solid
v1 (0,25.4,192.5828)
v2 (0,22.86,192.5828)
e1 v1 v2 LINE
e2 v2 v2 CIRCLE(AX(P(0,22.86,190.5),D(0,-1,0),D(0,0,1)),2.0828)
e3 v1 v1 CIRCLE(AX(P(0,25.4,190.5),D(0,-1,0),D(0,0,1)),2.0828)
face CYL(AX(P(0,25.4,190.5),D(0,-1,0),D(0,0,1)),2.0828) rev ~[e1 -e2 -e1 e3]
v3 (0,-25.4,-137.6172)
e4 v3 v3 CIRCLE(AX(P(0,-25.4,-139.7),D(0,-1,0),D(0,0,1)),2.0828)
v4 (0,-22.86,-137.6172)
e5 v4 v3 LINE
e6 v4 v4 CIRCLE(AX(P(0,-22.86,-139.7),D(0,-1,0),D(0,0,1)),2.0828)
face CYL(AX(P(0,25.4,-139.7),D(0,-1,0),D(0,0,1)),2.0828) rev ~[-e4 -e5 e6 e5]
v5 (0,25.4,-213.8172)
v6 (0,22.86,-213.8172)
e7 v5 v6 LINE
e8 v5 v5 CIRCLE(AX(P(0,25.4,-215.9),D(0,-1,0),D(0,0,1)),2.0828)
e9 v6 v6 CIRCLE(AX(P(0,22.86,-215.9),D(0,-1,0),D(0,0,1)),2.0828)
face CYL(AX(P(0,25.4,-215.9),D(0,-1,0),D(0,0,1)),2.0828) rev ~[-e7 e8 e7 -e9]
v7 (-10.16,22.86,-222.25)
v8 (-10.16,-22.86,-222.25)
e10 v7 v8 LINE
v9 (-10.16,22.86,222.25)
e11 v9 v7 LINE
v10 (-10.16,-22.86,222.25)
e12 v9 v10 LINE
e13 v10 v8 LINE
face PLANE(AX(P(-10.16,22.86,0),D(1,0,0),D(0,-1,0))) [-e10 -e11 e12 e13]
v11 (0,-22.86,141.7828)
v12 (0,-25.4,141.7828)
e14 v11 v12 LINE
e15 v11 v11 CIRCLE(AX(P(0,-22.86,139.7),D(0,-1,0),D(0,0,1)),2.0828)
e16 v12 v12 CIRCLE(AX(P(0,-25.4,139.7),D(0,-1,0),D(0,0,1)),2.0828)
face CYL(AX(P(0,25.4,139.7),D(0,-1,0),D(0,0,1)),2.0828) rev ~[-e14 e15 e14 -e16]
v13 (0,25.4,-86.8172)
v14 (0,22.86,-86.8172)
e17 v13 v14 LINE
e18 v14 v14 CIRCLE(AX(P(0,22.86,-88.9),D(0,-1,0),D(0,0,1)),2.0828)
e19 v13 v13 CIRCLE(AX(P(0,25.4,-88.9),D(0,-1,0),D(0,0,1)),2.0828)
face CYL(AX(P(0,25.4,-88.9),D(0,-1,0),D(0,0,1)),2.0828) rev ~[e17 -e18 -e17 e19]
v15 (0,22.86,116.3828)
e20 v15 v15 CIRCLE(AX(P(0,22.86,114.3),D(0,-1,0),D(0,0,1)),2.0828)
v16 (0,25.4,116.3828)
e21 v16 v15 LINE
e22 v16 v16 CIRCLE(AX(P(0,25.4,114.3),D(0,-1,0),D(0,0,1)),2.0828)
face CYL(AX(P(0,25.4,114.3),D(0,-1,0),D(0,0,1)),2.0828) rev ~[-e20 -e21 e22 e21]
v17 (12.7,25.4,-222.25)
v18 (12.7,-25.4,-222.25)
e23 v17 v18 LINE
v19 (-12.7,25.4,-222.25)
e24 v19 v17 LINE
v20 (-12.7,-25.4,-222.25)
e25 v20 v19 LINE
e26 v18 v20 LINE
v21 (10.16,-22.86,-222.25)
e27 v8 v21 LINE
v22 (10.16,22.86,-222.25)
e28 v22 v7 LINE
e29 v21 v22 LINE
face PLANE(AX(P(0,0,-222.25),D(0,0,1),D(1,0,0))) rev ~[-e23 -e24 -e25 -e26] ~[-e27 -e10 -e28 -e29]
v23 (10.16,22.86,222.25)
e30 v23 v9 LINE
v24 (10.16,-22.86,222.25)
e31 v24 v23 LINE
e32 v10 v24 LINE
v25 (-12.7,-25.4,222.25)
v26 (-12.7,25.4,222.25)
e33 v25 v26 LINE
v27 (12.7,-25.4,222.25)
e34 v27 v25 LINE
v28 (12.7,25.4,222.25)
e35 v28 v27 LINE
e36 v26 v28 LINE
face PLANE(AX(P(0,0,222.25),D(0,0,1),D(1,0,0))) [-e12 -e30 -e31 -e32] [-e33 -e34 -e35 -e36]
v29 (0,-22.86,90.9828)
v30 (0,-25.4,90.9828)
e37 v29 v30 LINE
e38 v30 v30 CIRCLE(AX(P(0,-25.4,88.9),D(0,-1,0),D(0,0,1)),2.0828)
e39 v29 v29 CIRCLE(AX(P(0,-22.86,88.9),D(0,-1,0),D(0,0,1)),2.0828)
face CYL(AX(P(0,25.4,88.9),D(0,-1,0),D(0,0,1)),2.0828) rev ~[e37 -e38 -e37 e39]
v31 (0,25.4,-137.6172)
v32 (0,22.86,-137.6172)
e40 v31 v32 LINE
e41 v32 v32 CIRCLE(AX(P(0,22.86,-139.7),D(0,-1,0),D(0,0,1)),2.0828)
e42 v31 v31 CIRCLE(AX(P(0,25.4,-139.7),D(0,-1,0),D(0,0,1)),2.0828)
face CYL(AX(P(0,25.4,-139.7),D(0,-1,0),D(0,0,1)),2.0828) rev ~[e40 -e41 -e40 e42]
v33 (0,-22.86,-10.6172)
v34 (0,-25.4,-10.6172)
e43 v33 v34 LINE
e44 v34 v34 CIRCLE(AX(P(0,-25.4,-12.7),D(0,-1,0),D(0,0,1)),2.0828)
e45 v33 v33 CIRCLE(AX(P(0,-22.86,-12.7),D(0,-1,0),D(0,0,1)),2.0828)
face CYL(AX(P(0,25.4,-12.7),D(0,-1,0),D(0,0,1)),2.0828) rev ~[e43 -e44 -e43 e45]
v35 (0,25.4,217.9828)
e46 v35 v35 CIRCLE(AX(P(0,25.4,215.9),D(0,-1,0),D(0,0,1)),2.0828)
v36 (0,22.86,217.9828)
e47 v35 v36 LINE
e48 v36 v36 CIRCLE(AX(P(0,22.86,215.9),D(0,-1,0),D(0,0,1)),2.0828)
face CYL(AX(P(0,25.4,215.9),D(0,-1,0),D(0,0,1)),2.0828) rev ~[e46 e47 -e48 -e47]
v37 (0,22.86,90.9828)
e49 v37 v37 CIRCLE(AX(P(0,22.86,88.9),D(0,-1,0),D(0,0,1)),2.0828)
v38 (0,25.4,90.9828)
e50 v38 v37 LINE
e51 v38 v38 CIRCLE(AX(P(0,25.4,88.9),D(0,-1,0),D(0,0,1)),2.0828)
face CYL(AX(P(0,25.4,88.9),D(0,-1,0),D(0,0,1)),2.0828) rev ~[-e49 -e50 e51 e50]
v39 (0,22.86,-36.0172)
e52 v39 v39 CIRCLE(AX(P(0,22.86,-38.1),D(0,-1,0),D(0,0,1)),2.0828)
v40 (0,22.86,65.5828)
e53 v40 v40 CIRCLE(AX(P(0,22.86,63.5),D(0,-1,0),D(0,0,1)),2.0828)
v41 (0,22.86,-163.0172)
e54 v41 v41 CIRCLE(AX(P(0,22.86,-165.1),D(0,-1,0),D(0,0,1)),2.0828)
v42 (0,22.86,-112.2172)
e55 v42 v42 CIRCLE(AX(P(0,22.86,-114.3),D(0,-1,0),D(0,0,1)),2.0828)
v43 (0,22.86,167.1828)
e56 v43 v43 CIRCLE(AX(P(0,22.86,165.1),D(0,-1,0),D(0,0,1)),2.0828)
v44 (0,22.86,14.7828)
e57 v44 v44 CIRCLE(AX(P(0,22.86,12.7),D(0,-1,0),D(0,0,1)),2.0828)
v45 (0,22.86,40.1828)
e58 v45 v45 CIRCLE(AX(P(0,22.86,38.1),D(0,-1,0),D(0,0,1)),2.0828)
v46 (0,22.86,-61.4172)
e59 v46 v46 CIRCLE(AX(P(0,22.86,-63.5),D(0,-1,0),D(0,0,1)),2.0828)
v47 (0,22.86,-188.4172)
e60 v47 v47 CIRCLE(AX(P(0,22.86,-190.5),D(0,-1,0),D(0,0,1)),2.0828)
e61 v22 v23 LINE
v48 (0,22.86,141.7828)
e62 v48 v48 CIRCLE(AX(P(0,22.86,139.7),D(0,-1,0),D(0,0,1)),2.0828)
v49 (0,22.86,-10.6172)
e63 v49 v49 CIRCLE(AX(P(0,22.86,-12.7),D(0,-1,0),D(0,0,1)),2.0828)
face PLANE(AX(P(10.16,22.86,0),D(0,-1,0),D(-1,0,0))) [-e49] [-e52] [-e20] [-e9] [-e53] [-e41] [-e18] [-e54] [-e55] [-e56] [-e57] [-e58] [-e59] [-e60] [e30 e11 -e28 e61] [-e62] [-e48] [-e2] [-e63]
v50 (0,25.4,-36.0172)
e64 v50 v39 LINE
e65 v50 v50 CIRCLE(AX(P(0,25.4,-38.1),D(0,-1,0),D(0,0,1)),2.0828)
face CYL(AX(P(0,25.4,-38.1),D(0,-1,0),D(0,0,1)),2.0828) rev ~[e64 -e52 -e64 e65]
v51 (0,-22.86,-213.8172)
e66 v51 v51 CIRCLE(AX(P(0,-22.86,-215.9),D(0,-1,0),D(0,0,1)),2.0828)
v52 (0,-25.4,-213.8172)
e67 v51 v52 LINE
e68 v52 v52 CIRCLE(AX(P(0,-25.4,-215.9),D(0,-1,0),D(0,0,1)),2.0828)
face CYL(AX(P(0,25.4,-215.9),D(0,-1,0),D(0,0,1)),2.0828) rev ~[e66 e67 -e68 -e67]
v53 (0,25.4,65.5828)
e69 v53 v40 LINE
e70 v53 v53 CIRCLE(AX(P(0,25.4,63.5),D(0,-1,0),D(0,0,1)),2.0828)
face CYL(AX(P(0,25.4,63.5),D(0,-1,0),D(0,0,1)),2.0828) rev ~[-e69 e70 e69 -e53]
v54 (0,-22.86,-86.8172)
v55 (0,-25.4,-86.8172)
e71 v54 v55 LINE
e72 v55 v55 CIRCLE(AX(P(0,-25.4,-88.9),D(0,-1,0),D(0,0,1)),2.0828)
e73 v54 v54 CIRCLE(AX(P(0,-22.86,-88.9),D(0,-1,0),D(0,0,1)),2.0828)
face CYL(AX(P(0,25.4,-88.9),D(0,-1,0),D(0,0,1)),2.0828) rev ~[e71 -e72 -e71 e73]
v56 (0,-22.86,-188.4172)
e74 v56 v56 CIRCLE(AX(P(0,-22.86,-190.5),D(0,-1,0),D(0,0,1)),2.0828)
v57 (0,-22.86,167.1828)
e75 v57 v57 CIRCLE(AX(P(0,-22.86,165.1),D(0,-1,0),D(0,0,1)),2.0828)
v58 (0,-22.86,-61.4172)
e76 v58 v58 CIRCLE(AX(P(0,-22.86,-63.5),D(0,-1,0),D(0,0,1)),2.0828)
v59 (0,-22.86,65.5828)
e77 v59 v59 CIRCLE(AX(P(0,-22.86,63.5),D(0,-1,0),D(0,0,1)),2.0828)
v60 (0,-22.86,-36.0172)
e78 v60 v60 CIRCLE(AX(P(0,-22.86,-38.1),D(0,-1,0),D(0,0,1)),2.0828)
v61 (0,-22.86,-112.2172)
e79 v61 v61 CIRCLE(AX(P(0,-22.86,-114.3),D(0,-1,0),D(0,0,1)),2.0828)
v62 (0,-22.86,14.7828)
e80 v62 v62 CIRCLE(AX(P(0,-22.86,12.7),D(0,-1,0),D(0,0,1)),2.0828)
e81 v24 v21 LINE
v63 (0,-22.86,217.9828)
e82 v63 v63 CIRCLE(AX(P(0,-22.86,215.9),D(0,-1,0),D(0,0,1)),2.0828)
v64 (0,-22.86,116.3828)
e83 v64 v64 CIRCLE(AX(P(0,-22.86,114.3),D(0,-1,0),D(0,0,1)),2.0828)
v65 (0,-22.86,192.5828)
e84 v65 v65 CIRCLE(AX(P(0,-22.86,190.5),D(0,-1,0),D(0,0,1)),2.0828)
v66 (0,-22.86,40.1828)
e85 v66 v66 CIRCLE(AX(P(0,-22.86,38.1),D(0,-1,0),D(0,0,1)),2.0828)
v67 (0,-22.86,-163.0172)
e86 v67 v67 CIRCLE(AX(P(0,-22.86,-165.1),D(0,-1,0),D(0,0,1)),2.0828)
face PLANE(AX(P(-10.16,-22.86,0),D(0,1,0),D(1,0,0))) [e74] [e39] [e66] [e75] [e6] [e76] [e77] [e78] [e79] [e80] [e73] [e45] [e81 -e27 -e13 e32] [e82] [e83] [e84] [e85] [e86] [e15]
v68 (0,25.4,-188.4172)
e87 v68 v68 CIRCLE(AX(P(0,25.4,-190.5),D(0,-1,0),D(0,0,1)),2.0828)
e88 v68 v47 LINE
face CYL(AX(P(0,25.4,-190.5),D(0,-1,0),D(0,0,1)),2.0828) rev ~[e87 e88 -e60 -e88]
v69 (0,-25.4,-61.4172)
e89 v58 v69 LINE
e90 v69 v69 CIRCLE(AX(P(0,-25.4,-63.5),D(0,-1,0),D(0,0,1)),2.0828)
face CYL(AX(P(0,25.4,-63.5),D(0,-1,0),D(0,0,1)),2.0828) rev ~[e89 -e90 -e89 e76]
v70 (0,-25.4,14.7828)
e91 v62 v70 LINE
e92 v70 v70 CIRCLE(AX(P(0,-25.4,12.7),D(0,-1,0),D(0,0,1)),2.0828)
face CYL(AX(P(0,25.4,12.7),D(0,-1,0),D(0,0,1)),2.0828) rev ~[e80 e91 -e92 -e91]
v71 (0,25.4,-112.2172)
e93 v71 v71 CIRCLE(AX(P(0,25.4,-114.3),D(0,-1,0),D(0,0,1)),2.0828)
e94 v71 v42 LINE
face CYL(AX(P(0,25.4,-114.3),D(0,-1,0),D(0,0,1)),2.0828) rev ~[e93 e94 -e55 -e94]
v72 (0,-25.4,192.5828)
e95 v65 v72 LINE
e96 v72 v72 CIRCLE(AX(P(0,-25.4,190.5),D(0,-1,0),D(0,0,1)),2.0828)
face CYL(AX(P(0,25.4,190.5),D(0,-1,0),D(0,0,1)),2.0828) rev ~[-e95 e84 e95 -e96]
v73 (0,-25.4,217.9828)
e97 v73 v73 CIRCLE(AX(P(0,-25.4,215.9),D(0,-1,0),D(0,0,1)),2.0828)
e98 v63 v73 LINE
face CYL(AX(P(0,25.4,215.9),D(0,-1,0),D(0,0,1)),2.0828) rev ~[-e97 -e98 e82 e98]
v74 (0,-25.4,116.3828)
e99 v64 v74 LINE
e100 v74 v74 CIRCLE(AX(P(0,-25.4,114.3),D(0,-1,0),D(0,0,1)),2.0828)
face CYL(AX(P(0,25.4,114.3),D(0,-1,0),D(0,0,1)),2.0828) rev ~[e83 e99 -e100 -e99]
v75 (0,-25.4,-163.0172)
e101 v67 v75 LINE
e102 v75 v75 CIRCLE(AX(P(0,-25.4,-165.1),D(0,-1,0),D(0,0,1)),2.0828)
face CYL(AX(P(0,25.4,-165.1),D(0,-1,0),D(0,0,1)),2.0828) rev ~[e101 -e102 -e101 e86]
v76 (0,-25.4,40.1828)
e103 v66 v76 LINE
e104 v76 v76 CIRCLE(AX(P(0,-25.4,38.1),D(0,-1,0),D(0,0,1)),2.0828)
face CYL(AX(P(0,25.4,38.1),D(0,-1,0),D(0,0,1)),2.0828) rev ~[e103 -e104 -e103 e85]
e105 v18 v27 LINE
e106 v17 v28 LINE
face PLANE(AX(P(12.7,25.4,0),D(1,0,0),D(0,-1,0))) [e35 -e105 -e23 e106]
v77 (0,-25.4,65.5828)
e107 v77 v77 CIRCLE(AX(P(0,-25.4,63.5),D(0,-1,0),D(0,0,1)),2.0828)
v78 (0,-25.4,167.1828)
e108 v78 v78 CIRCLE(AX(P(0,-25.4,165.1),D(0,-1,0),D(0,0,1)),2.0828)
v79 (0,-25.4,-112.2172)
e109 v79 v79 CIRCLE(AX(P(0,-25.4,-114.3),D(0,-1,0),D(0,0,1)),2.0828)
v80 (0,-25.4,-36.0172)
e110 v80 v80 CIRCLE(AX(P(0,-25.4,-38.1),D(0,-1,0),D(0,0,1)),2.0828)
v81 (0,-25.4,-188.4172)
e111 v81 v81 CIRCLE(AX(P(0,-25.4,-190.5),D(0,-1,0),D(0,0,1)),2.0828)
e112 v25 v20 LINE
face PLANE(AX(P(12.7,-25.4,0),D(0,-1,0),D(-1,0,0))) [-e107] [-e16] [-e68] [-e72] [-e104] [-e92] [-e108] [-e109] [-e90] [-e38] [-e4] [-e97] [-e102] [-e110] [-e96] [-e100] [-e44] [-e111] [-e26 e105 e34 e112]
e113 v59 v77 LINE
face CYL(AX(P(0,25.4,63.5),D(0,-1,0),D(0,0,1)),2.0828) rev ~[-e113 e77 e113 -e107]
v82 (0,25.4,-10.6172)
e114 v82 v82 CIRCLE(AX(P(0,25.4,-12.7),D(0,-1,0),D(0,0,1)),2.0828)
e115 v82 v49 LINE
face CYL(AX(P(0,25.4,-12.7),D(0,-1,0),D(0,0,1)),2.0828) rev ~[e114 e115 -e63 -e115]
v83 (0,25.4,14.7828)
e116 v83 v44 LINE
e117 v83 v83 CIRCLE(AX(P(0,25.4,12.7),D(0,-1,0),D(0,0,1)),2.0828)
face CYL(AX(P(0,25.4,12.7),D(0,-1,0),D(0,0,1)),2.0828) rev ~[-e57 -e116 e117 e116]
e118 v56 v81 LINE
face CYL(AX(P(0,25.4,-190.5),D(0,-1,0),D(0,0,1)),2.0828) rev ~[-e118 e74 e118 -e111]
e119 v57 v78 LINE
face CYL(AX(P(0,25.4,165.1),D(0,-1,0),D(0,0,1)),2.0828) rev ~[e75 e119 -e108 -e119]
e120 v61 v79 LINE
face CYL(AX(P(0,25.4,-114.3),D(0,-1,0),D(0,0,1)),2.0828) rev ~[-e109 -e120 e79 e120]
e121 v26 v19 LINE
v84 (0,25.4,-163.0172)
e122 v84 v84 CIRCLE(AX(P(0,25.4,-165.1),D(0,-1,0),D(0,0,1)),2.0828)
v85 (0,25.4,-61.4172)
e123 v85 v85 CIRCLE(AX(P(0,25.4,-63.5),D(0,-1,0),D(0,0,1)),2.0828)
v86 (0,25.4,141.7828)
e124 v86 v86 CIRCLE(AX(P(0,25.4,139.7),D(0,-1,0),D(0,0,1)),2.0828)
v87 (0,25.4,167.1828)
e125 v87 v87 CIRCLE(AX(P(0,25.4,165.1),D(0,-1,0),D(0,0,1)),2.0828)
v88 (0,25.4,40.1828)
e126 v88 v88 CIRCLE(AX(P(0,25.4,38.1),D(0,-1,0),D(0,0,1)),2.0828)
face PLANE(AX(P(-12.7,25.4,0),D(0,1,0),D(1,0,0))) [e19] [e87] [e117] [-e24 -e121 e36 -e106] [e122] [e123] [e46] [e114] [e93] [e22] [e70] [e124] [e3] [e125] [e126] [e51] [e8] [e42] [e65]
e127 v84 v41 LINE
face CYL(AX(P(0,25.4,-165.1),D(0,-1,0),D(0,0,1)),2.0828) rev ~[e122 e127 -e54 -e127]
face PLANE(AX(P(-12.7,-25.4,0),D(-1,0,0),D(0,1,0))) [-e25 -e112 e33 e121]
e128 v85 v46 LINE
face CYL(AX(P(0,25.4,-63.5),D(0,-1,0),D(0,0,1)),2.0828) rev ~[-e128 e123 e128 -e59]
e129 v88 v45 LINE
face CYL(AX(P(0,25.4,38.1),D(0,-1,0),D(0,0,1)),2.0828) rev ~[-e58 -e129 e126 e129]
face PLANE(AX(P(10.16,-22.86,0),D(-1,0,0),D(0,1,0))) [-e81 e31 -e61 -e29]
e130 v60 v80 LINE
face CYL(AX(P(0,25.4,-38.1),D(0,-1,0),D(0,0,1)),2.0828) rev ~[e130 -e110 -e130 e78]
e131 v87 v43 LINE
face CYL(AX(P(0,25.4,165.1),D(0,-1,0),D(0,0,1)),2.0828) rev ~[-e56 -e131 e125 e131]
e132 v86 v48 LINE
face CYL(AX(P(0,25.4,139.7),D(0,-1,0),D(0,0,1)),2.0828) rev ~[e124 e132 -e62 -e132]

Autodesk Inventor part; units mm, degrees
ref_plane "YZ Plane" through (0, 0, 0) normal (1, 0, 0) x (0, 1, 0)
ref_plane "XZ Plane" through (0, 0, 0) normal (0, 1, 0) x (-1, 0, 0)
ref_plane "XY Plane" through (0, 0, 0) normal (0, 0, 1) x (1, 0, 0)
sketch "Sketch1" plane through (0, 0, 0) normal (0, 0, 1) x (1, 0, 0)
  line L0 (12.7, -25.4) -> (-12.7, -25.4)
  line L1 (-12.7, -25.4) -> (-12.7, 25.4)
  line L2 (-12.7, 25.4) -> (12.7, 25.4)
  line L3 (12.7, 25.4) -> (12.7, -25.4)
  line L4 (12.7, -25.4) -> (-12.7, 25.4) construction
  line L5 (-12.7, -25.4) -> (12.7, 25.4) construction
  line L6 (10.16, 22.86) -> (-10.16, 22.86)
  line L7 (-10.16, 22.86) -> (-10.16, -22.86)
  line L8 (-10.16, -22.86) -> (10.16, -22.86)
  line L9 (10.16, -22.86) -> (10.16, 22.86)
  point P0 (0, 0)
  dimension "d0" = 25.4
  dimension "d1" = 50.8
  dimension "d2" = 2.54
extrude "Extrusion1" add sketch "Sketch1" along normal mid plane 444.5
sketch "Sketch2" plane through (-12.7, 25.4, 222.25) normal (0, 1, 0) x (1, 0, 0)
  point P0 (12.7, 222.25)
  point P1 (12.7, 234.95)
  point P2 (12.7, 209.55)
  dimension "HoleOffset" = 12.7
  dimension "d6" = 12.7
hole "Hole1" at (0, 25.4, -12.7) at (0, 25.4, 12.7) direction (0, -1, 0) diameter 4.1656 end through all
pattern_linear "Rectangular Pattern1" count 31 spacing 50.8 along (0, 0, 1) of "Hole1" first direction both ways yes
properties part number "VersaFrame End Rail" material "Aluminum 6061"
